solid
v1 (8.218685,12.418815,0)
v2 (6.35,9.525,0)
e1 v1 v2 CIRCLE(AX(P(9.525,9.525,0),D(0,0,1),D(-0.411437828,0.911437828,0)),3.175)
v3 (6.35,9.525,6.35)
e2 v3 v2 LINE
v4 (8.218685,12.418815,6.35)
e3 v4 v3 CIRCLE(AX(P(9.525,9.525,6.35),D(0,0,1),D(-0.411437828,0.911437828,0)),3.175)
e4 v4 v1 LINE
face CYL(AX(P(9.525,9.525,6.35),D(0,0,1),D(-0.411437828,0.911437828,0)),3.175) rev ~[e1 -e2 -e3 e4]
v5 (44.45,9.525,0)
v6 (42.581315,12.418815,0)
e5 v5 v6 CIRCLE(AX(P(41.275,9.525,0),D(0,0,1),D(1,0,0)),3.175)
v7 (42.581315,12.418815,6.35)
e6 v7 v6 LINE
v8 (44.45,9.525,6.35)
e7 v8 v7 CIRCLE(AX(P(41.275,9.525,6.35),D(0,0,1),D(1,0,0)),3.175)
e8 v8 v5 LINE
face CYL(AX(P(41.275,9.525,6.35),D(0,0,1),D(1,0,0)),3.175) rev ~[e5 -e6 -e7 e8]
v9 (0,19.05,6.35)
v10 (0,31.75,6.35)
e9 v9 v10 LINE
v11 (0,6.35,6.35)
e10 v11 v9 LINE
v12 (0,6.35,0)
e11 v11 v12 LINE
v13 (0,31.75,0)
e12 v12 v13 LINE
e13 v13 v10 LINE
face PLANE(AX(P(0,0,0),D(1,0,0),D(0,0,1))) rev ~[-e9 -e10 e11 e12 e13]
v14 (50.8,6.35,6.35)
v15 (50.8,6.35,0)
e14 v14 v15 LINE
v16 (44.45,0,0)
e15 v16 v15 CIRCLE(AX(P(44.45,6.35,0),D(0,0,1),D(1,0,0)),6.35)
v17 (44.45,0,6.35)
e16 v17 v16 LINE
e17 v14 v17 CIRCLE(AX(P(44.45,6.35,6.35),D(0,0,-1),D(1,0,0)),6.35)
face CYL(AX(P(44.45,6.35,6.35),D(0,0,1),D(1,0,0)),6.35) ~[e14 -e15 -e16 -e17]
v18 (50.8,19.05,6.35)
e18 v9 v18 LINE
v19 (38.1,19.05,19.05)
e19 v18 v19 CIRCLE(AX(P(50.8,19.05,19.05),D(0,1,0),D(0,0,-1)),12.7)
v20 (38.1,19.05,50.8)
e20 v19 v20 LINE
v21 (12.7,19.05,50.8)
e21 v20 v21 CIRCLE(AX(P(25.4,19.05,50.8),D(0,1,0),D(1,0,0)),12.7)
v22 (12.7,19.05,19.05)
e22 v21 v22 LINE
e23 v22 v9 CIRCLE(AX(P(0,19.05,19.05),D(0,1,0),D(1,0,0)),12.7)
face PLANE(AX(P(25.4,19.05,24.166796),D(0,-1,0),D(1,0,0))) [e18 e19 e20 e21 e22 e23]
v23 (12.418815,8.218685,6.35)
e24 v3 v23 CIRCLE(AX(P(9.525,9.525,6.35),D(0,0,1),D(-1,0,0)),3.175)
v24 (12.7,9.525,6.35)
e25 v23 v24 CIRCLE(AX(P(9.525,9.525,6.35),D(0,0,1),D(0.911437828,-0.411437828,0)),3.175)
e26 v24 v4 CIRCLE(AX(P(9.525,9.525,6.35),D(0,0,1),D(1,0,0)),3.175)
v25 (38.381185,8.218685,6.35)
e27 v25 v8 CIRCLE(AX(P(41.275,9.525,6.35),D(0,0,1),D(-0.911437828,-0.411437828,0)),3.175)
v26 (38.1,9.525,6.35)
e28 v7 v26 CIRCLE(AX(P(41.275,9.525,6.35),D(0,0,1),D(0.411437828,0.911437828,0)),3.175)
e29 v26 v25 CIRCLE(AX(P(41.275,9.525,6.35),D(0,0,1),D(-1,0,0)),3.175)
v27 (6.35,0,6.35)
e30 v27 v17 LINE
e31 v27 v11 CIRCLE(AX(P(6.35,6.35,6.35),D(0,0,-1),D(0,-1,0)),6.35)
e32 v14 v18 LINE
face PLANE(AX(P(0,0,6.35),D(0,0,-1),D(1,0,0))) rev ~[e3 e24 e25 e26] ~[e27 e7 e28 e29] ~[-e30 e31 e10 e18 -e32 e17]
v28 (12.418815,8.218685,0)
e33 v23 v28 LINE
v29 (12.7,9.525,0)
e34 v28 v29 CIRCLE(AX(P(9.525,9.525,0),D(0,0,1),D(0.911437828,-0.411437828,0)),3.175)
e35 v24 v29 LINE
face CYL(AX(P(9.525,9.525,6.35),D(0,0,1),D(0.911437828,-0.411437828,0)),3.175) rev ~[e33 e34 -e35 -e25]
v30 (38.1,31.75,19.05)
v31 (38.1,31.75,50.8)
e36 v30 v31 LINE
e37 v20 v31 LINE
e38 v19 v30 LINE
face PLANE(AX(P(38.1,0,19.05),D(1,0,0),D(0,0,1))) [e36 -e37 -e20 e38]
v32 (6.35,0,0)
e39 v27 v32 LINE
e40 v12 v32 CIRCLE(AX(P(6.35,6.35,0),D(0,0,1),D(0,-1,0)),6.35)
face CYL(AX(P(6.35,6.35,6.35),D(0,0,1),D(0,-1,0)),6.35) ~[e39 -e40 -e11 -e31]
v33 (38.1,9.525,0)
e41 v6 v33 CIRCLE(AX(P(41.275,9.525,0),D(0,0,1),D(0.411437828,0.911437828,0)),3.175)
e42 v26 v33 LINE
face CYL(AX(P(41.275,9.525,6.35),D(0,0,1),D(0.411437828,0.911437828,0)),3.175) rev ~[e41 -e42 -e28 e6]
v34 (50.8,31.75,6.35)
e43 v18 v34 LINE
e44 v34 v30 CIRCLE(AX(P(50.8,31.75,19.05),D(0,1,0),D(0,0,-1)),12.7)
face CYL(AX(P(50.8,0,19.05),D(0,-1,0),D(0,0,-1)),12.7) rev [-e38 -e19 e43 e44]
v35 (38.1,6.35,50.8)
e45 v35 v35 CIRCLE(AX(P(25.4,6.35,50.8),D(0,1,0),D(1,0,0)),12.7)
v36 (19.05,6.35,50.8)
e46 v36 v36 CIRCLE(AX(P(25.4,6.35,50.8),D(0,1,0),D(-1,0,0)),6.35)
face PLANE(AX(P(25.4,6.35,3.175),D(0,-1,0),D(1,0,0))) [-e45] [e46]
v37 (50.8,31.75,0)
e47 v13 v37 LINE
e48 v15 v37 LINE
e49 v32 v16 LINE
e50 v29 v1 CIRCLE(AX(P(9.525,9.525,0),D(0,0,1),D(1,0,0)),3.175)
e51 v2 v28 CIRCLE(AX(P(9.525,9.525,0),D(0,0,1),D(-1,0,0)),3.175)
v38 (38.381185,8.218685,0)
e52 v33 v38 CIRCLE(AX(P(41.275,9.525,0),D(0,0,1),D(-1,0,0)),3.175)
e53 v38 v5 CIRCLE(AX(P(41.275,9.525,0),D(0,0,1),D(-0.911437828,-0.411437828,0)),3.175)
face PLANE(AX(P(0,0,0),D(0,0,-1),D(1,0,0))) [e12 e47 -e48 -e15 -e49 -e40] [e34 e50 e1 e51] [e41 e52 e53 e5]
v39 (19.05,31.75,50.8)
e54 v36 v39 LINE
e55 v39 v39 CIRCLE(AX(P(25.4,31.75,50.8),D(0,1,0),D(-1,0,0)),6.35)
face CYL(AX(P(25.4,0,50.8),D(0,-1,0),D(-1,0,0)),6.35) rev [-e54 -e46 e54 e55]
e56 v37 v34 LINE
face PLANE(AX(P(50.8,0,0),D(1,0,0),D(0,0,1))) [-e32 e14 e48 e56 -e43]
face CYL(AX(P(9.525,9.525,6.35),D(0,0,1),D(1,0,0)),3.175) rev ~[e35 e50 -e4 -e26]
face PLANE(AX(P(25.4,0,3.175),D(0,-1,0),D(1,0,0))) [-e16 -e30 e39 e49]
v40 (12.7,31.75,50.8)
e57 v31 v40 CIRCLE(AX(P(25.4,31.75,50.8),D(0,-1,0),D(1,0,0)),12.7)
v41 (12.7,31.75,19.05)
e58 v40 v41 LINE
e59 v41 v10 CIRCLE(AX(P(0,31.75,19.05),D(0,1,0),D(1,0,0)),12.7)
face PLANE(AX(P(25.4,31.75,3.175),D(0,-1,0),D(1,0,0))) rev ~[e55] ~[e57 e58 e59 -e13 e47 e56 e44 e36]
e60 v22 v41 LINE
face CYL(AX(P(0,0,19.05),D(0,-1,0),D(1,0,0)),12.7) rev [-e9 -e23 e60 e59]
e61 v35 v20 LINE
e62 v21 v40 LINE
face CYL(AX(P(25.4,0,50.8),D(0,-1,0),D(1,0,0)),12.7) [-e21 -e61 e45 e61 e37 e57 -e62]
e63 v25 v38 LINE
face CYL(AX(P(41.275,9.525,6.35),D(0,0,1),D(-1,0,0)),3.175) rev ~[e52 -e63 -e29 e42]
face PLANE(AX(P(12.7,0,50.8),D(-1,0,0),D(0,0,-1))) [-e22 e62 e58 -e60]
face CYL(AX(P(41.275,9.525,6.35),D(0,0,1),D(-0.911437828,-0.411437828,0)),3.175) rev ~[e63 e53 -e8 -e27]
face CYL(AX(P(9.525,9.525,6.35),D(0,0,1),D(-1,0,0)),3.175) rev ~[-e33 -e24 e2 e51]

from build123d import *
from build123d import SkipClean  # not in build123d's __all__

# Parameters (mm, degrees)
F0_W     = 50.8
F0_H     = 6.35
F1_DEPTH = 31.75
F3_DEPTH = 19.05
F4_DEPTH = 6.35
F6_DEPTH = 6.351


with BuildPart() as f1:
    # F0 (on Front) → F1 (new body)
    with BuildSketch(Plane.XZ):
        with Locations((25.4, 3.175)):
            Rectangle(F0_W, F0_H)
        with BuildLine():
            ThreePointArc((12.7, 19.05), (8.9802561211, 10.0697438789), (0, 6.35))
            Line((0, 6.35), (50.8, 6.35))
            ThreePointArc((50.8, 6.35), (41.8197438789, 10.0697438789), (38.1, 19.05))
            Line((38.1, 19.05), (38.1, 50.8))
            ThreePointArc((38.1, 50.8), (25.4, 38.1), (12.7, 50.8))
            Line((12.7, 50.8), (12.7, 19.05))
        make_face()
        with BuildLine():
            Line((19.05, 50.8), (12.7, 50.8))
            ThreePointArc((12.7, 50.8), (25.4, 38.1), (38.1, 50.8))
            Line((38.1, 50.8), (31.75, 50.8))
            ThreePointArc((31.75, 50.8), (25.4, 44.45), (19.05, 50.8))
        make_face()
        with BuildLine():
            ThreePointArc((38.1, 50.8), (25.4, 63.5), (12.7, 50.8))
            Line((12.7, 50.8), (19.05, 50.8))
            ThreePointArc((19.05, 50.8), (25.4, 57.15), (31.75, 50.8))
            Line((31.75, 50.8), (38.1, 50.8))
        make_face()
    extrude(amount=-F1_DEPTH)

    # F2 (on face) → F3 (cut)
    with BuildSketch(Plane.XZ):
        with BuildLine():
            ThreePointArc((12.7, 19.05), (8.9802561211, 10.0697438789), (0, 6.35))
            Line((0, 6.35), (50.8, 6.35))
            ThreePointArc((50.8, 6.35), (41.8197438789, 10.0697438789), (38.1, 19.05))
            Line((38.1, 19.05), (38.1, 50.8))
            ThreePointArc((38.1, 50.8), (25.4, 38.1), (12.7, 50.8))
            Line((12.7, 50.8), (12.7, 19.05))
        make_face()
    with SkipClean():  # cleaning this boolean's faces spoils the solid; the shape is the same uncleaned
        extrude(amount=-F3_DEPTH, mode=Mode.SUBTRACT)

    # F4 (cut): a face of the model
    f4_faces = [f1.faces().sort_by_distance(p)[0] for p in [
        (25.4, 0, 63.1407897552),
    ]]
    extrude(f4_faces, amount=-F4_DEPTH, mode=Mode.SUBTRACT)

    # F5 (on face) → F6 (cut, through all)
    with BuildSketch(Plane.XY.offset(6.35)):
        with BuildLine():
            ThreePointArc((12.7, 9.525), (11.2473638622, 12.1922247236), (8.2186848968, 12.4188151032))
            ThreePointArc((8.2186848968, 12.4188151032), (10.3079286634, 11.3156118148), (11.849261314, 9.525))
            Line((11.849261314, 9.525), (12.7, 9.525))
        make_face()
        with BuildLine():
            ThreePointArc((11.849261314, 9.525), (10.3079286634, 11.3156118148), (8.2186848968, 12.4188151032))
            ThreePointArc((8.2186848968, 12.4188151032), (6.8577752764, 11.2473638622), (6.35, 9.525))
            Line((6.35, 9.525), (11.849261314, 9.525))
        make_face()
        with BuildLine():
            ThreePointArc((6.35, 9.525), (8.8568824776, 6.4210921444), (12.4188151032, 8.2186848968))
            ThreePointArc((12.4188151032, 8.2186848968), (12.1708000125, 8.8878706063), (11.849261314, 9.525))
            Line((11.849261314, 9.525), (6.35, 9.525))
        make_face()
        with BuildLine():
            ThreePointArc((11.849261314, 9.525), (12.1708000125, 8.8878706063), (12.4188151032, 8.2186848968))
            ThreePointArc((12.4188151032, 8.2186848968), (12.6289078556, 8.8568824776), (12.7, 9.525))
            Line((12.7, 9.525), (11.849261314, 9.525))
        make_face()
        with BuildLine():
            ThreePointArc((38.950738686, 9.525), (40.4920713366, 11.3156118148), (42.5813151032, 12.4188151032))
            ThreePointArc((42.5813151032, 12.4188151032), (39.5526361378, 12.1922247236), (38.1, 9.525))
            Line((38.1, 9.525), (38.950738686, 9.525))
        make_face()
        with BuildLine():
            ThreePointArc((44.45, 9.525), (43.9422247236, 11.2473638622), (42.5813151032, 12.4188151032))
            ThreePointArc((42.5813151032, 12.4188151032), (40.4920713366, 11.3156118148), (38.950738686, 9.525))
            Line((38.950738686, 9.525), (44.45, 9.525))
        make_face()
        with BuildLine():
            ThreePointArc((38.950738686, 9.525), (38.6291999875, 8.8878706063), (38.3811848968, 8.2186848968))
            ThreePointArc((38.3811848968, 8.2186848968), (41.9431175224, 6.4210921444), (44.45, 9.525))
            Line((44.45, 9.525), (38.950738686, 9.525))
        make_face()
        with BuildLine():
            ThreePointArc((38.1, 9.525), (38.1710921444, 8.8568824776), (38.3811848968, 8.2186848968))
            ThreePointArc((38.3811848968, 8.2186848968), (38.6291999875, 8.8878706063), (38.950738686, 9.525))
            Line((38.950738686, 9.525), (38.1, 9.525))
        make_face()
        with BuildLine():
            Line((44.45, 0), (50.8, 0))
            Line((50.8, 0), (50.8, 6.35))
            ThreePointArc((50.8, 6.35), (48.9401280605, 1.8598719395), (44.45, 0))
        make_face()
        with BuildLine():
            Line((0, 0), (6.35, 0))
            ThreePointArc((6.35, 0), (1.8598719395, 1.8598719395), (0, 6.35))
            Line((0, 6.35), (0, 0))
        make_face()
    extrude(amount=-F6_DEPTH, mode=Mode.SUBTRACT)


solid = f1.part
